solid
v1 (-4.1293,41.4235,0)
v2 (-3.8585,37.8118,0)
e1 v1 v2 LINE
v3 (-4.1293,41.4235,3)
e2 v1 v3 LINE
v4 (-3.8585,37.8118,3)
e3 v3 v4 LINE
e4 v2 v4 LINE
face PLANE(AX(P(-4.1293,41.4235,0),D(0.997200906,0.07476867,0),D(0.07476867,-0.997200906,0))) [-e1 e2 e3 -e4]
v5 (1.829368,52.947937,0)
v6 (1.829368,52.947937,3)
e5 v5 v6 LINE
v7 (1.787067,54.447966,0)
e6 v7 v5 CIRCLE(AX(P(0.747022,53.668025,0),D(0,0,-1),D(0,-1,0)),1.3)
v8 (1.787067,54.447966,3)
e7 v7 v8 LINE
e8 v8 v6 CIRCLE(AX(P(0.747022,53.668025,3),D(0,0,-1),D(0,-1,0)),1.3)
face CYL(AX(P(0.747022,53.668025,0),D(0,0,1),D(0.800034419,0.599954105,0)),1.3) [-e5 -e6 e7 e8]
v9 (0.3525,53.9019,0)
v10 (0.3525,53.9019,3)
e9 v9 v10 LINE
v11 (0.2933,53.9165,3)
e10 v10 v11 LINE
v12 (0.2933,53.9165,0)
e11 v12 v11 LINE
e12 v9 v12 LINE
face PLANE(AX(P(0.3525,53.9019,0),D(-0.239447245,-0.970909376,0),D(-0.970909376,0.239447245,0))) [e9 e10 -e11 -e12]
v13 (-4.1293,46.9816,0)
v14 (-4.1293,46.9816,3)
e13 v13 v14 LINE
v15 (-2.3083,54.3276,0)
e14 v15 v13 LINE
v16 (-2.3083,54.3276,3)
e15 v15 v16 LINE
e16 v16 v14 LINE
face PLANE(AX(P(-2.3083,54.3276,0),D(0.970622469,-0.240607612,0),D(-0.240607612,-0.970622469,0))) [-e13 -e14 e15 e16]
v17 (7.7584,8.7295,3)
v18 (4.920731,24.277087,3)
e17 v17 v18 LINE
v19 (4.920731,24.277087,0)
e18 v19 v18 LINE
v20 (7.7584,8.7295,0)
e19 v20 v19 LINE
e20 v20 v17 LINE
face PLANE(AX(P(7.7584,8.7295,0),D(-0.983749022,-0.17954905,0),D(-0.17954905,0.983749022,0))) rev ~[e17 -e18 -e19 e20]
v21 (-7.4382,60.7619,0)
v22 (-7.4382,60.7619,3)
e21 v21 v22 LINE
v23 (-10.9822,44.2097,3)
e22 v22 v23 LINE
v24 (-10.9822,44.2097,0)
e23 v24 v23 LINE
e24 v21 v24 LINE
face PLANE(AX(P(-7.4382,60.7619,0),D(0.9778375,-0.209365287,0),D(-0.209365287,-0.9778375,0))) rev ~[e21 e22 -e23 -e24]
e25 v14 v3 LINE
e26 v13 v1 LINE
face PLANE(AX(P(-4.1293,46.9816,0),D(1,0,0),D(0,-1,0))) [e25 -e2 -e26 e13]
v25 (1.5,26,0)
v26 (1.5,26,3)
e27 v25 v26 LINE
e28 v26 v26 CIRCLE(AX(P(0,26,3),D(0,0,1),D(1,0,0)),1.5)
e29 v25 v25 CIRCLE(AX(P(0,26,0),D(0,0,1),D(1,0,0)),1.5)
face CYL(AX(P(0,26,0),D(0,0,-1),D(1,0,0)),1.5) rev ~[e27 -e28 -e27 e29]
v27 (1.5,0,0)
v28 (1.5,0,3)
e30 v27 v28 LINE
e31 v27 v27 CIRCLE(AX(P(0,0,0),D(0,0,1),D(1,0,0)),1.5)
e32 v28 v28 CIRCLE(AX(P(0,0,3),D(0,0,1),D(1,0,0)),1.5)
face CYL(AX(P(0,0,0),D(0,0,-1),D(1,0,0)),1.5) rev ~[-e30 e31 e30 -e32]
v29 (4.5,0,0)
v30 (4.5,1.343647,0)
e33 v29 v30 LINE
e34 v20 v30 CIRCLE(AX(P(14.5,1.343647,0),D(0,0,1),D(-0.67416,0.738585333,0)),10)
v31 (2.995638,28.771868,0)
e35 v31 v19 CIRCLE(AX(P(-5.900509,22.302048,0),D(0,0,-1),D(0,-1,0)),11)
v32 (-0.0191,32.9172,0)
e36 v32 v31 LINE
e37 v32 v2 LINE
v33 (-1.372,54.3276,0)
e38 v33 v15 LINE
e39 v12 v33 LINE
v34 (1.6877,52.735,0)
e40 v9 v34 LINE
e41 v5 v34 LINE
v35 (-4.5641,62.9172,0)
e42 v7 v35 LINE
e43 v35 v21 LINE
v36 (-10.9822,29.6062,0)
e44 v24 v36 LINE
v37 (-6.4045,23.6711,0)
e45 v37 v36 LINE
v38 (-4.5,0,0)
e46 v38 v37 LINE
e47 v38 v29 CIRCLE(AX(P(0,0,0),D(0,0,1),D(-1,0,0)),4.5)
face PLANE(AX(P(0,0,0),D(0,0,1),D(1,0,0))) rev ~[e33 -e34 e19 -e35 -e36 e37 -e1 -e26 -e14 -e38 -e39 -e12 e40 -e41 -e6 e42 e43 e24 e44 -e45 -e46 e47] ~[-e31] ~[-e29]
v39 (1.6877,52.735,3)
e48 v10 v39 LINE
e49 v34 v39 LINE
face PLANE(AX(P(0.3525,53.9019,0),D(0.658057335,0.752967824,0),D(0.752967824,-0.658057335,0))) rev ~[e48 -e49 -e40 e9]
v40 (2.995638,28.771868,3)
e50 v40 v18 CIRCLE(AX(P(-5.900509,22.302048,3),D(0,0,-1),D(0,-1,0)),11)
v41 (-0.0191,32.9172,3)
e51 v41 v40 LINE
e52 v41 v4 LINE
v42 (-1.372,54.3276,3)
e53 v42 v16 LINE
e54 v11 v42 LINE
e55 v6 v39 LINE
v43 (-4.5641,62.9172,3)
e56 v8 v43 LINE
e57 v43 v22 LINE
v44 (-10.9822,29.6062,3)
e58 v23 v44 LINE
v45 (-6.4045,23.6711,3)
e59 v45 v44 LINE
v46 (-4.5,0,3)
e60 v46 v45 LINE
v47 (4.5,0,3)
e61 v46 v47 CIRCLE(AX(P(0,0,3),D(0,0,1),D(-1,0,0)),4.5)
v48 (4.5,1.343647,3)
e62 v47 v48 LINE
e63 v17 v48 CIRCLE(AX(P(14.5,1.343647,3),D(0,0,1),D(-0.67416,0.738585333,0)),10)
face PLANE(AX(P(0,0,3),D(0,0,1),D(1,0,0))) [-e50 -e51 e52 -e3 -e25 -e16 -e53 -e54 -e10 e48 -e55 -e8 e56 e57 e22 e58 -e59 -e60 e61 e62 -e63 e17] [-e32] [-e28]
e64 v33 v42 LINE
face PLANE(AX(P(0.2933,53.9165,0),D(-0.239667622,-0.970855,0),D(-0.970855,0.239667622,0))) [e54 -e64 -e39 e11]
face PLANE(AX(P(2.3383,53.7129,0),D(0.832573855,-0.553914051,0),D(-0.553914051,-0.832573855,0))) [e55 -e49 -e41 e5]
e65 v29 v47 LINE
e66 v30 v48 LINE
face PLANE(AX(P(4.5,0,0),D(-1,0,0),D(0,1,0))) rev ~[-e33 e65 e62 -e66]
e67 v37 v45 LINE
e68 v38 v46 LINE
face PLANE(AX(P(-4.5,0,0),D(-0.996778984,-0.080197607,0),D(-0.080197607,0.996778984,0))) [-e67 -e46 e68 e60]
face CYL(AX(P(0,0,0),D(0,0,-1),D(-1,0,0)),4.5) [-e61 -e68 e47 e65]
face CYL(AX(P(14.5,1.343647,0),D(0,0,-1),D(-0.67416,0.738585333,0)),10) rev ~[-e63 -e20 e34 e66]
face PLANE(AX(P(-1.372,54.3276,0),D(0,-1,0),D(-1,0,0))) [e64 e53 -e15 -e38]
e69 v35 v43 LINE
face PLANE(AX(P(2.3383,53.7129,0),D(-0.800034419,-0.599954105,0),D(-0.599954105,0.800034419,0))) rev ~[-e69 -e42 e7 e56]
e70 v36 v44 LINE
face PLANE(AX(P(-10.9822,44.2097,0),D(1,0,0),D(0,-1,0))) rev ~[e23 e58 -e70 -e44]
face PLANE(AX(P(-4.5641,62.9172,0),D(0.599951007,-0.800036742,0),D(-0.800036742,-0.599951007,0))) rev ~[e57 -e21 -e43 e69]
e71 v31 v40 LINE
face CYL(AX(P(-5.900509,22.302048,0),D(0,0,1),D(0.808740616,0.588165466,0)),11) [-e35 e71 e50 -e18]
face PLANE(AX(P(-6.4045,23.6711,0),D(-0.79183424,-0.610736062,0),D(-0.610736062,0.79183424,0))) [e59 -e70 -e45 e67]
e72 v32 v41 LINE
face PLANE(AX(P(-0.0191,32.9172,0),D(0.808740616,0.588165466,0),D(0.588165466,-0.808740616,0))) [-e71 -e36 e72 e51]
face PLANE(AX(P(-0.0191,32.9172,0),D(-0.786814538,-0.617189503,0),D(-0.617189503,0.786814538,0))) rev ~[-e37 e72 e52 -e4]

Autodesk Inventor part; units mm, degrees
ref_plane "YZ Plane" through (0, 0, 0) normal (1, 0, 0) x (0, 1, 0)
ref_plane "XZ Plane" through (0, 0, 0) normal (0, 1, 0) x (-1, 0, 0)
ref_plane "XY Plane" through (0, 0, 0) normal (0, 0, 1) x (1, 0, 0)
sketch "Sketch1" plane through (0, 0, 0) normal (0, 0, 1) x (1, 0, 0)
  circle A0 centre (0, 0) radius 1.5
  circle A1 centre (0, 26) radius 1.5
  arc A2 (-4.5, 0) -> (4.5, 0) centre (0, 0) ccw
  line L0 (4.5, 0) -> (4.5, 7.98)
  line L1 (-4.5, 0) -> (-6.4045, 23.6711)
  line L2 (-4.5, 0) -> (21.43, 0) construction
  line L3 (4.5, 7.98) -> (7.7584, 8.7295)
  line L4 (-1.4921, 25.8465) -> (17.6104, 25.8465) construction
  line L5 (-1.372, 54.3276) -> (-2.3083, 54.3276)
  line L6 (-4.5641, 62.9172) -> (-7.4382, 60.7619)
  line L7 (7.7584, 8.7295) -> (4.4705, 26.7439)
  line L8 (-0.0191, 32.9172) -> (4.4705, 26.7439)
  line L9 (0.2933, 53.9165) -> (-1.372, 54.3276)
  line L10 (-4.1293, 46.9816) -> (-4.1293, 41.4235)
  line L11 (-4.1293, 41.4235) -> (-3.8585, 37.8118)
  line L12 (-10.9822, 44.2097) -> (-10.9822, 29.6062)
  line L13 (2.3383, 53.7129) -> (1.6877, 52.735)
  line L14 (-7.4382, 60.7619) -> (-10.9822, 44.2097)
  line L15 (-2.3083, 54.3276) -> (-4.1293, 46.9816)
  line L16 (-6.4045, 23.6711) -> (-10.9822, 29.6062)
  line L17 (-0.0191, 32.9172) -> (-3.8585, 37.8118)
  line L18 (0.3525, 53.9019) -> (1.6877, 52.735)
  line L19 (2.3383, 53.7129) -> (-4.5641, 62.9172)
  line L20 (0.3525, 53.9019) -> (0.2933, 53.9165)
  dimension "d1" = 3
  dimension "d0" = 3
  dimension "d2" = 26
  dimension "d3" = 9
  dimension "d4" = 7.98
  dimension "d6" = 94.6
extrude "Extrusion1" add sketch "Sketch1" along normal blind 3
fillet "Fillet1" radius 10 1 edges at (4.5, 7.98, 1.5)
fillet "Fillet6" radius 11 1 edges at (4.4705, 26.7439, 1.5)
fillet "Fillet7" radius 1.3 1 edges at (2.3383, 53.7129, 1.5)
properties part number "grip1a" material "ABS Plastic"
